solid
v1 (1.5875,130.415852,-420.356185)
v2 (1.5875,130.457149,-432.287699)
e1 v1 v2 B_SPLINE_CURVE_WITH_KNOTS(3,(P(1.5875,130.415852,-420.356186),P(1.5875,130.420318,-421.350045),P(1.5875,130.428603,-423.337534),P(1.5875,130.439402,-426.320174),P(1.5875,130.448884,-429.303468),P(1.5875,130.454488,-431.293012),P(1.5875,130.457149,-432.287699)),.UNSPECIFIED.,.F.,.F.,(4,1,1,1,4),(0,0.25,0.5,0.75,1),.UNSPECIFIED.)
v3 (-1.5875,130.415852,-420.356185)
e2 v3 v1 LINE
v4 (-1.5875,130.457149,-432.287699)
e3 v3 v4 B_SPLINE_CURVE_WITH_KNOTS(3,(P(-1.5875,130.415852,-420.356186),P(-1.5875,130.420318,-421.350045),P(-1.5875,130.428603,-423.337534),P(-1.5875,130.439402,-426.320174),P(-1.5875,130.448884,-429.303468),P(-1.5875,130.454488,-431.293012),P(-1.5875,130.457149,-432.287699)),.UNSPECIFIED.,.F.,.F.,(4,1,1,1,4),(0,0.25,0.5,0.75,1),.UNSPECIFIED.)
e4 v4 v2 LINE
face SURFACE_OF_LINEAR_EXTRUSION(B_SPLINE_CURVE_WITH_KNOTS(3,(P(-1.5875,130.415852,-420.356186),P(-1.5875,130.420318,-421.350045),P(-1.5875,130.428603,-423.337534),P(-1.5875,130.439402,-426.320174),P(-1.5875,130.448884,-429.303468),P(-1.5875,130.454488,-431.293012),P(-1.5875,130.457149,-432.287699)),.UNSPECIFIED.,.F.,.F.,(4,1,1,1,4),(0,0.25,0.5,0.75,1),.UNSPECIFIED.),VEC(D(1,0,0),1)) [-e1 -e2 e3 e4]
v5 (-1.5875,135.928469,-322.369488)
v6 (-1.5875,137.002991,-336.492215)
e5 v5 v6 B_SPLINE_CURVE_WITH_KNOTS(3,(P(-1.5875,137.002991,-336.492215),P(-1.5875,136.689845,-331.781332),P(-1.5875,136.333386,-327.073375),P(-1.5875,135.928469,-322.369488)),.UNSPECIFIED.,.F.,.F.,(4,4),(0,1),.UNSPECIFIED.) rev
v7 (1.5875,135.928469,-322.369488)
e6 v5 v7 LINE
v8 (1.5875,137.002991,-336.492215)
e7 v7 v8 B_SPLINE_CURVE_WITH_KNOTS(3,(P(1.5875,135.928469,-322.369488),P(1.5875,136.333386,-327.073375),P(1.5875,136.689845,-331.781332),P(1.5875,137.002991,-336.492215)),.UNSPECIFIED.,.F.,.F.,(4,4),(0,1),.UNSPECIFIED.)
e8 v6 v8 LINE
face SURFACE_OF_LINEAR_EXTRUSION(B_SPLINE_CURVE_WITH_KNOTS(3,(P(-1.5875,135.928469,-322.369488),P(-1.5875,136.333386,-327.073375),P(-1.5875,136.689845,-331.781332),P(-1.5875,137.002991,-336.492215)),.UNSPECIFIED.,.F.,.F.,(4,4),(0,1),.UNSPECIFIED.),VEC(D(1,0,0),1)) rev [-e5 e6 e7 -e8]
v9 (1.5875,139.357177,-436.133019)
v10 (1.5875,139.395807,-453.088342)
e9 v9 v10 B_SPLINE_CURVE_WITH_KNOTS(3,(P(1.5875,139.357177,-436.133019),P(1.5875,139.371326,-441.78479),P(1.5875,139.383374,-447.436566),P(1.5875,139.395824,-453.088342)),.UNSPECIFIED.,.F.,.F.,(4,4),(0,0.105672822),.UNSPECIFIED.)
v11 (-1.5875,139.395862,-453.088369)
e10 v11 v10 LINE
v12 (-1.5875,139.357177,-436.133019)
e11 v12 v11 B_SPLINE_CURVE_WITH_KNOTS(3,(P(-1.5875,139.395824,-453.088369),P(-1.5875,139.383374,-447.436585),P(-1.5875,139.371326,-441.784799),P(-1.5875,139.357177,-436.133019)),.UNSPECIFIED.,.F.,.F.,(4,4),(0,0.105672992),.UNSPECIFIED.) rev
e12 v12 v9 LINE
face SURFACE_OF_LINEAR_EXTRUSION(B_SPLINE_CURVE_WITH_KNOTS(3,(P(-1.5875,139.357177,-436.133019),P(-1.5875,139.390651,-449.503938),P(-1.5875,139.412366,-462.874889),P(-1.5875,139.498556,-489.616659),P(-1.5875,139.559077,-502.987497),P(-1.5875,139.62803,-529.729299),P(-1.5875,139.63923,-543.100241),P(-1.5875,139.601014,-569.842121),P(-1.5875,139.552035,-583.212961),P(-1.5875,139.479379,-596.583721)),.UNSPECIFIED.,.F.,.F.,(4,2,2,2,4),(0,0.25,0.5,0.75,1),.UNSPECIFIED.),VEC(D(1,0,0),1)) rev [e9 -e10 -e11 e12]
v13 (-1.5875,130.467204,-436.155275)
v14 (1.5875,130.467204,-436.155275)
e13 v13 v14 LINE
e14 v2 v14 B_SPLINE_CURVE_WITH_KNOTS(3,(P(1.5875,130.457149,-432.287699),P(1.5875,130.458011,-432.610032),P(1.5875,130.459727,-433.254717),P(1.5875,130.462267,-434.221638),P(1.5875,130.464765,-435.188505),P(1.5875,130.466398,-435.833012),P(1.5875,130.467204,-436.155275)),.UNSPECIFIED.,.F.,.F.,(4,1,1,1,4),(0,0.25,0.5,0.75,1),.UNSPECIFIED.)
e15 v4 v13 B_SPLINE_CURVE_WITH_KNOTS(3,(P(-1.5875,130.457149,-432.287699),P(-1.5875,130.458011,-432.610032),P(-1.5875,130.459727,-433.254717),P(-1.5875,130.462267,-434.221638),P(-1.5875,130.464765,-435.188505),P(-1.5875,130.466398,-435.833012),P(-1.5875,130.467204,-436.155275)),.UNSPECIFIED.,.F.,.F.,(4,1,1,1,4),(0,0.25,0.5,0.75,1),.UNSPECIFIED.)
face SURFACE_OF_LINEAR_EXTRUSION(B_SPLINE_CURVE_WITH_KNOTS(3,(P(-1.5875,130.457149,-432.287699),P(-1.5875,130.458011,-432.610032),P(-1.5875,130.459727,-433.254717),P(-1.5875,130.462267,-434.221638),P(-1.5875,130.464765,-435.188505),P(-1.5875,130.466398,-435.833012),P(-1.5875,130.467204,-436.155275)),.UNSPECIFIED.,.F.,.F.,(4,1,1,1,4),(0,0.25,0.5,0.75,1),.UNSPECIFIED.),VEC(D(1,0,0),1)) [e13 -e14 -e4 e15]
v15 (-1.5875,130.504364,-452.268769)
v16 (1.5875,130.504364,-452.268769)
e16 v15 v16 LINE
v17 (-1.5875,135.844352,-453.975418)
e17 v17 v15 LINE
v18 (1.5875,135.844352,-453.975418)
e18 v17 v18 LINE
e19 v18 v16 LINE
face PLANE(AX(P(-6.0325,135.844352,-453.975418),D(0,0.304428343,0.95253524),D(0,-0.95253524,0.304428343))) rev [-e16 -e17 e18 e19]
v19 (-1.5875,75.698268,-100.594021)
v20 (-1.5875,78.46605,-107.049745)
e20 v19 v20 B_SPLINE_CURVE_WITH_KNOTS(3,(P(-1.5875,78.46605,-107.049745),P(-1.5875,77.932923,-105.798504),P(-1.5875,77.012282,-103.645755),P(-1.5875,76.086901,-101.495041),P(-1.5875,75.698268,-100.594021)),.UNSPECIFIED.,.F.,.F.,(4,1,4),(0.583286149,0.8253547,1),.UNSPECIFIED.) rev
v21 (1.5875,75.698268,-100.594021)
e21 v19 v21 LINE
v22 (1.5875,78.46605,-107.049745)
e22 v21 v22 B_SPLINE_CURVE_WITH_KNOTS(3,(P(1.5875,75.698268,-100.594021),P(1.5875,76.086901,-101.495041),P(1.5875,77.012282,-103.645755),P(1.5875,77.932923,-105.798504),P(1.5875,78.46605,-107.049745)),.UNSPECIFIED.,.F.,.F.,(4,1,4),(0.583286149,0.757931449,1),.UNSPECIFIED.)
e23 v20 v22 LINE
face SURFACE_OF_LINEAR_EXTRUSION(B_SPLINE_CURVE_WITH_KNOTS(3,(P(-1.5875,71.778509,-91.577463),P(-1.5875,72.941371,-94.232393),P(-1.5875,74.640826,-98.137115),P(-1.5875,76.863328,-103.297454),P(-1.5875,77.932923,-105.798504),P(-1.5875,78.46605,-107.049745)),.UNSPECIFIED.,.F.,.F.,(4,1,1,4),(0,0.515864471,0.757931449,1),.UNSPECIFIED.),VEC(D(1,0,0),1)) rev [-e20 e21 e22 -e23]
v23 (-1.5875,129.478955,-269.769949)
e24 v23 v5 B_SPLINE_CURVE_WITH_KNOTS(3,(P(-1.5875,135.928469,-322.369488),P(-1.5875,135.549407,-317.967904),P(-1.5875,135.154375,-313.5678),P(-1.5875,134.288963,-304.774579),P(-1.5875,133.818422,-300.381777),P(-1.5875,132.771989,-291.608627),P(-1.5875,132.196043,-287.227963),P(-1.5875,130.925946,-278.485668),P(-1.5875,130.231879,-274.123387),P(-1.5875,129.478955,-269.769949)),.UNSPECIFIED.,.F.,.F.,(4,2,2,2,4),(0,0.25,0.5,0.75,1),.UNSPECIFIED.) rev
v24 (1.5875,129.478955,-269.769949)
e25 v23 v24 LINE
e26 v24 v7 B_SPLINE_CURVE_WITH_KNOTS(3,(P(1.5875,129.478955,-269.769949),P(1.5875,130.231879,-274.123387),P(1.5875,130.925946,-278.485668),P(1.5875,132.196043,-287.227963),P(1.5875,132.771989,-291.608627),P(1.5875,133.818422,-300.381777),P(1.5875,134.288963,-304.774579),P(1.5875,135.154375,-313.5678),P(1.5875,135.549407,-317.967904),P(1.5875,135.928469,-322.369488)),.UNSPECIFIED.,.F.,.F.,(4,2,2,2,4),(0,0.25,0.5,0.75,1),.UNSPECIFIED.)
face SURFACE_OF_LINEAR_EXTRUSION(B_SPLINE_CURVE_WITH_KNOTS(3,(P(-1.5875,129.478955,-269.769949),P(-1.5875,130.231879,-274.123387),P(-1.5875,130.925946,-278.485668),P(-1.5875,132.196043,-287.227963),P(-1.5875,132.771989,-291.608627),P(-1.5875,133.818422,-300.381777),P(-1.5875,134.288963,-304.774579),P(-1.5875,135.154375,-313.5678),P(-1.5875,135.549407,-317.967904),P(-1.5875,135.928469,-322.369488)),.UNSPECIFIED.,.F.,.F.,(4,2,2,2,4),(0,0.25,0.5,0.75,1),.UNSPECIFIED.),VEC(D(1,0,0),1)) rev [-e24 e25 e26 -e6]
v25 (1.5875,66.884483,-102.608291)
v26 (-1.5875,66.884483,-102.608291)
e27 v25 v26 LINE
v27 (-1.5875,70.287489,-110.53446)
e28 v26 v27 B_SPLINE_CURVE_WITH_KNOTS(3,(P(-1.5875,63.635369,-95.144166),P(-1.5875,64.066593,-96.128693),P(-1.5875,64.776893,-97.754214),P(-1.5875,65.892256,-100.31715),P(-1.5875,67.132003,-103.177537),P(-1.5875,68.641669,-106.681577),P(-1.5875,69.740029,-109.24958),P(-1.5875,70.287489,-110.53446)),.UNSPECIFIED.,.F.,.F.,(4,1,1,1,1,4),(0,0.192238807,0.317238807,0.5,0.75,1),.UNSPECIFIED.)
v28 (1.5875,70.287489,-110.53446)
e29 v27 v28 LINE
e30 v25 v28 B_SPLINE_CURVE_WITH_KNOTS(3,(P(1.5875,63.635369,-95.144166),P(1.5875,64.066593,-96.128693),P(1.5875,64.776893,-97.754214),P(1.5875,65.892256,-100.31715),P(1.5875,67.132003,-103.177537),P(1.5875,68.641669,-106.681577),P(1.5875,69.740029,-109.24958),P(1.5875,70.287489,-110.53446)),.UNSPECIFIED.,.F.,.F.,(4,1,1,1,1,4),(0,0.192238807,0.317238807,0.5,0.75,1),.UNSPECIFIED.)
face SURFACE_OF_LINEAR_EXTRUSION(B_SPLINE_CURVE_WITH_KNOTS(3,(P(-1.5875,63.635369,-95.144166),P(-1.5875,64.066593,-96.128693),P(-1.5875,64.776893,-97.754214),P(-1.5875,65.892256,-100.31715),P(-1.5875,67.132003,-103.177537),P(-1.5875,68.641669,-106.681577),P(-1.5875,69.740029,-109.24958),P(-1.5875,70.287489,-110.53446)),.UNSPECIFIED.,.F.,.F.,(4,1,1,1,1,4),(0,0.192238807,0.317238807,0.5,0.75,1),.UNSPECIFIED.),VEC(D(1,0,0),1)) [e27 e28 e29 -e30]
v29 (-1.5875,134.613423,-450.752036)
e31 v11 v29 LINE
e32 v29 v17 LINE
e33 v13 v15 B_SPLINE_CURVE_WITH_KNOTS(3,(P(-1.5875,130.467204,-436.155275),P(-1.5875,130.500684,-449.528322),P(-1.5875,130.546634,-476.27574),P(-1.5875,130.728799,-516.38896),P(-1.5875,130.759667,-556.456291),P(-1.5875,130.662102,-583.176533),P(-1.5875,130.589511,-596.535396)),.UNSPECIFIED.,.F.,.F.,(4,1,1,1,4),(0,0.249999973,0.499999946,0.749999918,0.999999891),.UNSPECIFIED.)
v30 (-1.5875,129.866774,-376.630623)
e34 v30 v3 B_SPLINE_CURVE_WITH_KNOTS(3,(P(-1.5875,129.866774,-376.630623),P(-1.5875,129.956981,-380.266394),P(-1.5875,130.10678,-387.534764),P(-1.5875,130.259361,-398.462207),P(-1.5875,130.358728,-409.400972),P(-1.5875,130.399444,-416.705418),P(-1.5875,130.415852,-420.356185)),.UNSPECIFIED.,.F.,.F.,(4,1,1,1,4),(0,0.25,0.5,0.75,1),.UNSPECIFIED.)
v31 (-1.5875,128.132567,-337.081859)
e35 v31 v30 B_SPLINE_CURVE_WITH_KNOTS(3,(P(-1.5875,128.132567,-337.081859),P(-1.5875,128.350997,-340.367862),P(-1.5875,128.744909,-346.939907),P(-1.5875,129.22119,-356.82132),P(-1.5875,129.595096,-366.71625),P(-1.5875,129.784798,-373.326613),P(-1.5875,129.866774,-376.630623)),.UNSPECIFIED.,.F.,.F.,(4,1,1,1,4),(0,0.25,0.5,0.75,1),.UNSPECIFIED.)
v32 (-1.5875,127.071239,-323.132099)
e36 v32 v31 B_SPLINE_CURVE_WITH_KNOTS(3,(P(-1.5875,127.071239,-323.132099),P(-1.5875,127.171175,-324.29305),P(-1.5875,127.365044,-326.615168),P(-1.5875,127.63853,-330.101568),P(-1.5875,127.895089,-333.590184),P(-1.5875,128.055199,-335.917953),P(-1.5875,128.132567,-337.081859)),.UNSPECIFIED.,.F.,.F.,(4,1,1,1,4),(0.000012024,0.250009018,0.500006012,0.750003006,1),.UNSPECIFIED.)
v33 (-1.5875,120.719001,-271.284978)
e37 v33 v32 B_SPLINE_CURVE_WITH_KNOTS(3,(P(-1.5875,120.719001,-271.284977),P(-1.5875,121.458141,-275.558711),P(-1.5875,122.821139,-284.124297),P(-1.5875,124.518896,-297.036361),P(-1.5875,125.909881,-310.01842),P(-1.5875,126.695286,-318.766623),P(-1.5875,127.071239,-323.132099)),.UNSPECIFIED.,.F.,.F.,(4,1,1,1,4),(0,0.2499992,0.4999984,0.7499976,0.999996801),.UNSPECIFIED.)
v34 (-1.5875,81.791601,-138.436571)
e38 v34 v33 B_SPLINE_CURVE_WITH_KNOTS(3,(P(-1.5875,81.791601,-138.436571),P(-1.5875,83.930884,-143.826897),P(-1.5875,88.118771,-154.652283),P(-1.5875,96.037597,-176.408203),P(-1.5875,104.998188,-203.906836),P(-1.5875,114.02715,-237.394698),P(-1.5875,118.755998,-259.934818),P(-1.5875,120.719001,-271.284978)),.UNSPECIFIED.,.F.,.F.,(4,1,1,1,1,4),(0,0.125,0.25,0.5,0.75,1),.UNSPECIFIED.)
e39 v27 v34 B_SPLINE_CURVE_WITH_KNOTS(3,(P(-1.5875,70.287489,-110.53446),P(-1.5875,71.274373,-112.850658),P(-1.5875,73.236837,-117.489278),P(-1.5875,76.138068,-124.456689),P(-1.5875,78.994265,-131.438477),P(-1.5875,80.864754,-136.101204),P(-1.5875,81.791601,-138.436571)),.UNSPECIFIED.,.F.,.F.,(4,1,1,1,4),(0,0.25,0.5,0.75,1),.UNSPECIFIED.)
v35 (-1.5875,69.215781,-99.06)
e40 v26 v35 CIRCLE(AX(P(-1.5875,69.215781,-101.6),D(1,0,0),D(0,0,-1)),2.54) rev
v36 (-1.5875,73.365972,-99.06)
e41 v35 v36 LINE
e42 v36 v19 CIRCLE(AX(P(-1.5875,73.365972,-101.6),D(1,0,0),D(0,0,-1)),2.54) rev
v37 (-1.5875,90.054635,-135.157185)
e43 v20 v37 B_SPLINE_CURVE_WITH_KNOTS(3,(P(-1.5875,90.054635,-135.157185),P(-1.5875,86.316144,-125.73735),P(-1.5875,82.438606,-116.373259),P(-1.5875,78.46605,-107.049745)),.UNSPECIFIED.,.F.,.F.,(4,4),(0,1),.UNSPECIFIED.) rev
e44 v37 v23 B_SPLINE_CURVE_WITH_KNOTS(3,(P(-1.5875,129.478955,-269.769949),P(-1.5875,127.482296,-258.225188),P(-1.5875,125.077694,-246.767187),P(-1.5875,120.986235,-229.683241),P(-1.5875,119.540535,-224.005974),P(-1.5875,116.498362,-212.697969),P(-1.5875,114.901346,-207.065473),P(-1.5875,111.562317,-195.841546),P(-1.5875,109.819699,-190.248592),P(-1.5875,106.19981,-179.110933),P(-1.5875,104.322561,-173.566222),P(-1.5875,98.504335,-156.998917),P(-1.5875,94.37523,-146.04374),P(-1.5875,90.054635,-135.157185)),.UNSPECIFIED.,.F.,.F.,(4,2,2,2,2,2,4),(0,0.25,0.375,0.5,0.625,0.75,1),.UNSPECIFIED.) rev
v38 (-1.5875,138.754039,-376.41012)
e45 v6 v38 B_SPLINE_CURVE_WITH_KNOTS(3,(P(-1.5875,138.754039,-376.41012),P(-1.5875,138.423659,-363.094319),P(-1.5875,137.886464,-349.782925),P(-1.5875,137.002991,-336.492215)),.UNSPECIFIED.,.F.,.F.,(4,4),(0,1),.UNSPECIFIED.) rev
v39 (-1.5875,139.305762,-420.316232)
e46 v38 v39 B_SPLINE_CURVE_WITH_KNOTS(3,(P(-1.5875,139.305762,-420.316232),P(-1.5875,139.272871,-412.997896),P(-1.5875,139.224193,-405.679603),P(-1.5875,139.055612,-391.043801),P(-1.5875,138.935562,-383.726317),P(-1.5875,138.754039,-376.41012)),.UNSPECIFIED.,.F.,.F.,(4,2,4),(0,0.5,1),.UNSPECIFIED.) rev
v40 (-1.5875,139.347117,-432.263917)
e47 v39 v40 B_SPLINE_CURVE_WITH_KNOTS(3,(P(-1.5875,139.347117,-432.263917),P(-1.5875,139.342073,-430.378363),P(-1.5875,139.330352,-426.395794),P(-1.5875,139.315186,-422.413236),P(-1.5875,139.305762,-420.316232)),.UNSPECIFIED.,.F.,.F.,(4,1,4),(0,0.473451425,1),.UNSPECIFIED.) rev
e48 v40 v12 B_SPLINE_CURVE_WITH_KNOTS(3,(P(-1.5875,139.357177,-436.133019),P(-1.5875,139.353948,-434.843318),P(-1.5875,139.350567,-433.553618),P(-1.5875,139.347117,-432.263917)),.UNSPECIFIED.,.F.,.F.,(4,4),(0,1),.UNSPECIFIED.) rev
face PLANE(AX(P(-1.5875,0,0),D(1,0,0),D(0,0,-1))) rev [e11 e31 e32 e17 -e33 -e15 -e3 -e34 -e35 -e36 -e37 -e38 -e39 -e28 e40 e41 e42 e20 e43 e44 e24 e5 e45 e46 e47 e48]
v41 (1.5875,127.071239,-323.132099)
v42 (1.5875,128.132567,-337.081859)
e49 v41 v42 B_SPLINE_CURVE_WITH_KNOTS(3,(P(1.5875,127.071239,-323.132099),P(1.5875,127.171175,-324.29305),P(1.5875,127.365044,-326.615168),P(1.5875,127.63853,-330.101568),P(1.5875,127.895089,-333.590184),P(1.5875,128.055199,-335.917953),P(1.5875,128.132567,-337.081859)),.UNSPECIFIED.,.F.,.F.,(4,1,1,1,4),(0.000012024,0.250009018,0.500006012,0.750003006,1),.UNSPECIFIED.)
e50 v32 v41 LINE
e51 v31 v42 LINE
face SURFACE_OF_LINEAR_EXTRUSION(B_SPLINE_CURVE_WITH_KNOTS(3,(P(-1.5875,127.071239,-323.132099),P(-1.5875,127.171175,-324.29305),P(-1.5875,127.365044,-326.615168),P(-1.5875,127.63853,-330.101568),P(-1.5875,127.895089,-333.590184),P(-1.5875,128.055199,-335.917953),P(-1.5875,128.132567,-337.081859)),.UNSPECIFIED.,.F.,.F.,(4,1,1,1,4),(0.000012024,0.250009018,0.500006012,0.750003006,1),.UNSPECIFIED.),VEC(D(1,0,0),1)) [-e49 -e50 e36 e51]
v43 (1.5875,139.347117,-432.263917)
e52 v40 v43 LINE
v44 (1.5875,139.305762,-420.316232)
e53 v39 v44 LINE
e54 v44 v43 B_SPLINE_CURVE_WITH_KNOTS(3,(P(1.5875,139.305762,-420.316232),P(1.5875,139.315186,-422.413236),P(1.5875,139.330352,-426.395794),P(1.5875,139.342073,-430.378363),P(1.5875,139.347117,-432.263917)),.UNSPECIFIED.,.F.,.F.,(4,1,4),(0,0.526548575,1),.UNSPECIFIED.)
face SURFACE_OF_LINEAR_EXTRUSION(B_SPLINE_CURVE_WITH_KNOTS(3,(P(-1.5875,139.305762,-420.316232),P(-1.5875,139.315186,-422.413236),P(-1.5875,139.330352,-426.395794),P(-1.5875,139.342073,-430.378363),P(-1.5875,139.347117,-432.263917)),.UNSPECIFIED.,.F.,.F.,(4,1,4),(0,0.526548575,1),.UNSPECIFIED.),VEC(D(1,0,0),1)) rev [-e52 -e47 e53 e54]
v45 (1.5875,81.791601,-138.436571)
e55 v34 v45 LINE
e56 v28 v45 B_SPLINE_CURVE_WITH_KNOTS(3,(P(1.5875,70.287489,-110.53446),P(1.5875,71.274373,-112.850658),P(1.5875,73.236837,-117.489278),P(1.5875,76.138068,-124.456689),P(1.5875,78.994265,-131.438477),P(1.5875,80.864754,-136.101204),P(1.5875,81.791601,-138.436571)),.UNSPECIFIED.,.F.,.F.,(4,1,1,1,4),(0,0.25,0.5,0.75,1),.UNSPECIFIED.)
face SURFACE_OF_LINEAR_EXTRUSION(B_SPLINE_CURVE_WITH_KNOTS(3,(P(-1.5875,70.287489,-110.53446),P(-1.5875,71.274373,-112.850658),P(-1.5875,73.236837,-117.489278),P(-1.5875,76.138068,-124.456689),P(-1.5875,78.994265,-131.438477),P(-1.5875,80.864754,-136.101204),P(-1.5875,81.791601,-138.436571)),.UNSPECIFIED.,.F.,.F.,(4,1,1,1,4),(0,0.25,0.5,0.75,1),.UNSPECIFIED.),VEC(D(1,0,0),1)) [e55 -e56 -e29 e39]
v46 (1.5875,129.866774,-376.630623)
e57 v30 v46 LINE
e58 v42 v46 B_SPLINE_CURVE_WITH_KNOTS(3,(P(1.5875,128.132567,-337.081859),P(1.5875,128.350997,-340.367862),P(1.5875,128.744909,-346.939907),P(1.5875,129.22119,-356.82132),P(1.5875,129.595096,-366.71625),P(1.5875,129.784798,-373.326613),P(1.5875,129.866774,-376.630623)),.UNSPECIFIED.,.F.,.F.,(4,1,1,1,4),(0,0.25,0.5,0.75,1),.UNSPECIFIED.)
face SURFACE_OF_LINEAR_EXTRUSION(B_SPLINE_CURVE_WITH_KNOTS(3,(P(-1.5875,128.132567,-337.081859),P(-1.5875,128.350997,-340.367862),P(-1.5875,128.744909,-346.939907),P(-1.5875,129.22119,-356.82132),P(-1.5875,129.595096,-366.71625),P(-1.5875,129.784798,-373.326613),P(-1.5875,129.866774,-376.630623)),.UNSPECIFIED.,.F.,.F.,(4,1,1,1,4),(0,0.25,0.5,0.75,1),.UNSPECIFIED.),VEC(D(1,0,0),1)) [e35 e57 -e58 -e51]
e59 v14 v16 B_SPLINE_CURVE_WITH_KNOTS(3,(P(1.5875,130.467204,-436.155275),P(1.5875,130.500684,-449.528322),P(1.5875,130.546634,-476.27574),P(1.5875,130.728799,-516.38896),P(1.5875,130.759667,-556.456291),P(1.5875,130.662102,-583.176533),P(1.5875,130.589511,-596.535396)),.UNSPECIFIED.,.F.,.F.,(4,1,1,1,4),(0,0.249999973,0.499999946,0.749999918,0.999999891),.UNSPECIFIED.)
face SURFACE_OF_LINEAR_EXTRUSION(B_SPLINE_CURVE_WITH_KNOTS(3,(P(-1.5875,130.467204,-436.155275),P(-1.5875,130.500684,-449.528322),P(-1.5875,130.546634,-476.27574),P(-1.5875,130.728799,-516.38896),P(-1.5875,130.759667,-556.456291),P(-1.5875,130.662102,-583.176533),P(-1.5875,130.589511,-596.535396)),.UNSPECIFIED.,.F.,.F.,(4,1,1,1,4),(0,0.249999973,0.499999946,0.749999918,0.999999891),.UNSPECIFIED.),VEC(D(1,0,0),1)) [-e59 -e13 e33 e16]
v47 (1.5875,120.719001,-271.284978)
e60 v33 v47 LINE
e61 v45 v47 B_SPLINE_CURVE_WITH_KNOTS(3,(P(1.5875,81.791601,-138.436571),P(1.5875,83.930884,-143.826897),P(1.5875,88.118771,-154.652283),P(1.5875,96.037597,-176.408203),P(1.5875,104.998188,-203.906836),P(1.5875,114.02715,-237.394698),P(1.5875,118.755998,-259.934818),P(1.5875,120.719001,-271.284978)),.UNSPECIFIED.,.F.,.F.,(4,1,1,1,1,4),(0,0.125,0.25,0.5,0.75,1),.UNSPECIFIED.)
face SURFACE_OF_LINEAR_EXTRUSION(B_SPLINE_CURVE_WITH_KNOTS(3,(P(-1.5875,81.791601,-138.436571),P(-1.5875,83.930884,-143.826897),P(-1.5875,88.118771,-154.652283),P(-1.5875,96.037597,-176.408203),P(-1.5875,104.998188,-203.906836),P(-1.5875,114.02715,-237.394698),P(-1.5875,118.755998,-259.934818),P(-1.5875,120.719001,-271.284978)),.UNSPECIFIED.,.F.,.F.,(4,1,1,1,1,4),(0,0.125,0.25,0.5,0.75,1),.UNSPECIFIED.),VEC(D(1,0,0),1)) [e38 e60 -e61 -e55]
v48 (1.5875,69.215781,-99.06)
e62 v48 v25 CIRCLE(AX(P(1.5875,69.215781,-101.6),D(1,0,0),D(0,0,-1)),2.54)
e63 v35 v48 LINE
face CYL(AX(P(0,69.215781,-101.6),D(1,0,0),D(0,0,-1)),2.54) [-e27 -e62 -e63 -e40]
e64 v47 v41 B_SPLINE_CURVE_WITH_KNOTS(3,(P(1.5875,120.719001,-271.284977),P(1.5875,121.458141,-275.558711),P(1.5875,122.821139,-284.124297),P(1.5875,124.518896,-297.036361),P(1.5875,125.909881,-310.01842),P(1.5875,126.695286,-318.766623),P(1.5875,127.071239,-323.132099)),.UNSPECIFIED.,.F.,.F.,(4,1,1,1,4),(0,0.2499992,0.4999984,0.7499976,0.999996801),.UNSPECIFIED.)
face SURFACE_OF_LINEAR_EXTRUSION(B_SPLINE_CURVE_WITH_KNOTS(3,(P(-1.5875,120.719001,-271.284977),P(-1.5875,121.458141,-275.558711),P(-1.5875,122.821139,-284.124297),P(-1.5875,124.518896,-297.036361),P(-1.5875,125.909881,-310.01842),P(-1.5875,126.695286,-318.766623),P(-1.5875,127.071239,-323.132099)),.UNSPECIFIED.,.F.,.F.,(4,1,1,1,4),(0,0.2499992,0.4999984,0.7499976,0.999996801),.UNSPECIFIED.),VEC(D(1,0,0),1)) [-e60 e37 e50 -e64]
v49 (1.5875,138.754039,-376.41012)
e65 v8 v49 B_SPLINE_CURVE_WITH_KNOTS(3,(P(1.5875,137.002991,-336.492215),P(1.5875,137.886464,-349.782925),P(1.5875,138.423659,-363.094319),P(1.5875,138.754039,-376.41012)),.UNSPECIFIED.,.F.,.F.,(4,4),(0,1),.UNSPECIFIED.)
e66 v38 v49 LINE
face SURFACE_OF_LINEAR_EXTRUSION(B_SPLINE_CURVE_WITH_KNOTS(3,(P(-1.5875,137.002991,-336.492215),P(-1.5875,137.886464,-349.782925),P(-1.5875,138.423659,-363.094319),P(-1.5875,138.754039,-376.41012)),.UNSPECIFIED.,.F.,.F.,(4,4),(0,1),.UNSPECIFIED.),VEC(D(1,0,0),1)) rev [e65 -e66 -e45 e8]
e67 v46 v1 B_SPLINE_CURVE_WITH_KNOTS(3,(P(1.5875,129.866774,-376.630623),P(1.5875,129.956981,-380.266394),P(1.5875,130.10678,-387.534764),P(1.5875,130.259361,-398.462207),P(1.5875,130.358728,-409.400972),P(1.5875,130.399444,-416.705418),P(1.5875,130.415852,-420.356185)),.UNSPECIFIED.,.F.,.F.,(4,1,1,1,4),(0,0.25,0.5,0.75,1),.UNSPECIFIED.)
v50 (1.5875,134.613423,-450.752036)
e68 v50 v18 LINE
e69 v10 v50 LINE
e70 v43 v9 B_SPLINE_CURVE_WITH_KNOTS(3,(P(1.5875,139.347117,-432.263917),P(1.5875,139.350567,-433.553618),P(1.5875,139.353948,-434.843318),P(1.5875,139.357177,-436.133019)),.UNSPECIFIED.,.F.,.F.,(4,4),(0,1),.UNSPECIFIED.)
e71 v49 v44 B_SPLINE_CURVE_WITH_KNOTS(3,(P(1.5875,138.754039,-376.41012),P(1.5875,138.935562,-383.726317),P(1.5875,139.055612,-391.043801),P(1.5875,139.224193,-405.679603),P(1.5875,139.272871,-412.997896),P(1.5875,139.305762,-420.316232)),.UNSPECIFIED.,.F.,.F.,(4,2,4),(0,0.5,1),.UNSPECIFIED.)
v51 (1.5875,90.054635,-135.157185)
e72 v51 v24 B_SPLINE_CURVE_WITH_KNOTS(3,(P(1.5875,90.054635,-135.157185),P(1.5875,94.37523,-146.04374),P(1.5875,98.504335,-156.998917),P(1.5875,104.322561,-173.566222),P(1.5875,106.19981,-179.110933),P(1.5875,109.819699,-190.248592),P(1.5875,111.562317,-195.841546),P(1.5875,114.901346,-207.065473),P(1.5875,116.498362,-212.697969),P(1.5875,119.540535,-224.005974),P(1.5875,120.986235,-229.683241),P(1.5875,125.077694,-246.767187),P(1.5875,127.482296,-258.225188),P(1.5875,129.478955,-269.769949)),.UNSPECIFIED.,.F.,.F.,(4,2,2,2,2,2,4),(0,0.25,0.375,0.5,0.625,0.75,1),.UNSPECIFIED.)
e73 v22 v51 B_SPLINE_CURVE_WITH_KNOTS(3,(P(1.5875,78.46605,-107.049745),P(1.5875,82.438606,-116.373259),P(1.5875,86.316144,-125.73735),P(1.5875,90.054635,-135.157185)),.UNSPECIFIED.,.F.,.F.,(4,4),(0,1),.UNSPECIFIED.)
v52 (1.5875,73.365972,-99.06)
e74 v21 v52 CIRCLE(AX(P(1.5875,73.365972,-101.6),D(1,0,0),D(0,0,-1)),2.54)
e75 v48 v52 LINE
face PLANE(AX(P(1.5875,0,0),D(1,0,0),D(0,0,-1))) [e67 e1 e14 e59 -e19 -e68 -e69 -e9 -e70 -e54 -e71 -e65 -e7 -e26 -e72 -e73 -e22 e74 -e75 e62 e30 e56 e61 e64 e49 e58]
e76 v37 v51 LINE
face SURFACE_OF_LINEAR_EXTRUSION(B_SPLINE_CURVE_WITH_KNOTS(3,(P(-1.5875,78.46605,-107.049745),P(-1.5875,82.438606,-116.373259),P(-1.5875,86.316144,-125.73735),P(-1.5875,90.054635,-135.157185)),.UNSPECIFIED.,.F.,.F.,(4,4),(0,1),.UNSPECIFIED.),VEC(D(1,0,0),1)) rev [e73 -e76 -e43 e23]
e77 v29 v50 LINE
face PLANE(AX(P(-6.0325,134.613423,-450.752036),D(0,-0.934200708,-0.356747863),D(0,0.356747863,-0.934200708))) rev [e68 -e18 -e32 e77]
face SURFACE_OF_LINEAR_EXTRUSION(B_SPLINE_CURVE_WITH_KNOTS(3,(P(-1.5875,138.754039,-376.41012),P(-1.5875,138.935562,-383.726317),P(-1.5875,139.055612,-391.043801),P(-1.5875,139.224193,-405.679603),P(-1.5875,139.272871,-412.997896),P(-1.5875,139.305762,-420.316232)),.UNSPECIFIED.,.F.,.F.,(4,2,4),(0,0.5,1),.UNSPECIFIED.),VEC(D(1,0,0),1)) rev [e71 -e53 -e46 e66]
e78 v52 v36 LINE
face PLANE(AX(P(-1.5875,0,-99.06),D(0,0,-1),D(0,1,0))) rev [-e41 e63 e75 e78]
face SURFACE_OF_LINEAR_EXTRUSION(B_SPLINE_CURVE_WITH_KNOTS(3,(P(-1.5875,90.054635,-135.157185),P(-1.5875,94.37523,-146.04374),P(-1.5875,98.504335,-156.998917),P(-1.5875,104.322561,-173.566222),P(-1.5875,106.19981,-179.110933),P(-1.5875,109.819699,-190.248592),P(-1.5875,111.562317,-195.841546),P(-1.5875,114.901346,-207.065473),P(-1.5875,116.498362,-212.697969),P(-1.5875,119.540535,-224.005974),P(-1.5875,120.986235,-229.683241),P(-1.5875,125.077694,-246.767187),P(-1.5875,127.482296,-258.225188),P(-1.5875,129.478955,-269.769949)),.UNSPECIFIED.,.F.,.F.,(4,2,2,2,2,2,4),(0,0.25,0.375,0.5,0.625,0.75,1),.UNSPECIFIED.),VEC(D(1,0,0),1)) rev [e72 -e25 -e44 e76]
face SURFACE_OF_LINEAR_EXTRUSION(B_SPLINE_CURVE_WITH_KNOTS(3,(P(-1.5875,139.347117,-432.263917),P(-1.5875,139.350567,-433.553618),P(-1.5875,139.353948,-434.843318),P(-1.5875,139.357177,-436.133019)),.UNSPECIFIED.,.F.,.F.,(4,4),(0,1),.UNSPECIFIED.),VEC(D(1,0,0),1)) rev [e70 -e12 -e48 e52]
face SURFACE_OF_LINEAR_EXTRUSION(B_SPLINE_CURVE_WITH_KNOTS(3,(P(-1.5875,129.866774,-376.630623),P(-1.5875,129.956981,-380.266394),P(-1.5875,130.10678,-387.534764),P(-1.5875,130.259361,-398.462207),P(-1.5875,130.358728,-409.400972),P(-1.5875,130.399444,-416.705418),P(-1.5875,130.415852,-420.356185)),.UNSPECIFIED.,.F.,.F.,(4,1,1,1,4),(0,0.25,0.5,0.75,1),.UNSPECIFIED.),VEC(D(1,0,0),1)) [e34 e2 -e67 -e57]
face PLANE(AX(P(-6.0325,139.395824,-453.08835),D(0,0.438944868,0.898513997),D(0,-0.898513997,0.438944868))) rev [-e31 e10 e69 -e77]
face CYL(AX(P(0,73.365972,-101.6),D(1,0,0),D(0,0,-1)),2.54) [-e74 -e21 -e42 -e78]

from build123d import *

# Parameters (mm, degrees)
BOSS_EXTRUDE1_START = -1.5875
BOSS_EXTRUDE1_DEPTH = 3.175
FILLET1_R           = 2.54
CUT_EXTRUDE1_DEPTH  = 2674.191025632
FILLET2_R           = 0.762
FILLET3_R           = 0.762
CUT_EXTRUDE2_DEPTH  = 7.62


with BuildPart() as part:
    # Boss-Extrude1: read off the stored shape, not the designer's step
    # Boss-Extrude1 outline → Boss-Extrude1 (new body)
    with BuildSketch(Plane(origin=(0, 0, 0), x_dir=(0, 0, -1), z_dir=(1, 0, 0)).offset(BOSS_EXTRUDE1_START)):
        with BuildLine():
            add(Edge.make_bspline(
                [(1110.404970926, 130.384545774), (1120.170834465, 130.370061323), (1139.703057908, 130.338772026), (1168.998370974, 130.277673039), (1198.290610395, 130.194386876), (1217.81419633, 130.113940836), (1227.576506903, 130.06508052)],
                knots=[0, 0, 0, 0, 0.25, 0.5, 0.75, 1, 1, 1, 1], degree=3))
            add(Edge.make_bspline(
                [(1227.576506903, 130.06508052), (1269.911205773, 129.853195249), (1333.427746701, 129.273373321), (1418.042208161, 127.449050563), (1502.665994832, 124.913583682), (1608.454176987, 120.803299479), (1693.070073331, 116.848243245), (1735.369787733, 114.744712179)],
                knots=[0, 0, 0, 0, 0.25, 0.375, 0.5, 0.75, 1, 1, 1, 1], degree=3))
            add(Edge.make_bspline(
                [(1735.369787733, 114.744712179), (1815.995940723, 110.735232018), (1936.906650462, 104.096364548), (2098.049485168, 94.18797875), (2198.694736725, 87.314638509), (2279.130413747, 81.114418931), (2339.412950304, 76.034076608), (2399.564054334, 70.28270545), (2479.570468264, 61.127378254), (2559.292087872, 49.650907614), (2626.797554585, 38.235484735), (2656.889518578, 32.788503969), (2667.159793662, 30.877771266), (2669.54, 30.432069924)],
                knots=[0, 0, 0, 0, 0.25, 0.375, 0.5, 0.5625, 0.625, 0.6875, 0.75, 0.875, 0.9375, 0.96241067, 0.969928536, 0.969928536, 0.969928536, 0.969928536], degree=3))
            Line((2669.54, 30.432069924), (2669.54, 39.476142465))
            add(Edge.make_bspline(
                [(1735.811334709, 123.623740069), (1776.138635499, 121.618292624), (1816.460281579, 119.500621806), (1897.093668675, 115.087561885), (1937.405638896, 112.792971084), (2018.018419045, 108.018366523), (2058.319512223, 105.539122976), (2138.903780144, 100.307240032), (2179.18739793, 97.555127955), (2239.586998714, 93.080168687), (2259.716280977, 91.529837622), (2289.900442602, 89.09084343), (2299.960179135, 88.258845039), (2320.076004566, 86.552861654), (2330.132100898, 85.678962223), (2350.239356518, 83.874334847), (2360.290489794, 82.943307484), (2380.385973971, 81.003183297), (2390.430065378, 79.993418555), (2420.547026195, 76.827577532), (2440.60648589, 74.533672955), (2480.675569568, 69.556278523), (2500.68715183, 66.874150811), (2540.654290207, 61.150246295), (2560.611026428, 58.109755646), (2600.475457131, 51.702465574), (2620.382967089, 48.337538888), (2650.028116889, 43.072156367), (2659.78844051, 41.29687683), (2669.54, 39.476142465)],
                knots=[0, 0, 0, 0, 0.125, 0.125, 0.25, 0.25, 0.375, 0.375, 0.5, 0.5, 0.5625, 0.5625, 0.59375, 0.59375, 0.625, 0.625, 0.65625, 0.65625, 0.6875, 0.6875, 0.75, 0.75, 0.8125, 0.8125, 0.875, 0.875, 0.9375, 0.9375, 0.968210768, 0.968210768, 0.968210768, 0.968210768], degree=3))
            add(Edge.make_bspline(
                [(1227.621000751, 138.954969175), (1248.807303679, 138.848931677), (1269.993583155, 138.701170252), (1312.363832348, 138.270664618), (1333.547719008, 137.987407832), (1375.912368189, 137.249274813), (1397.09309738, 136.7925677), (1439.451328259, 135.701855835), (1460.629010312, 135.069210584), (1502.979101161, 133.670541385), (1524.152152736, 132.907434339), (1566.494303759, 131.284732459), (1587.663166024, 130.423163385), (1651.164052809, 127.709123983), (1693.490421561, 125.728325331), (1735.811334709, 123.623740069)],
                knots=[0, 0, 0, 0, 0.125, 0.125, 0.25, 0.25, 0.375, 0.375, 0.5, 0.5, 0.625, 0.625, 0.75, 0.75, 1, 1, 1, 1], degree=3))
            add(Edge.make_bspline(
                [(1110.418156307, 139.274535996), (1129.952027249, 139.245563914), (1149.485893504, 139.211997476), (1188.553558893, 139.115899087), (1208.087346834, 139.052735015), (1227.621000751, 138.954969175)],
                knots=[0, 0, 0, 0, 0.5, 0.5, 1, 1, 1, 1], degree=3))
            add(Edge.make_bspline(
                [(768.740124165, 138.468408213), (782.976796045, 138.460280143), (797.213453801, 138.479500079), (825.686695051, 138.549690296), (839.923258916, 138.600062665), (868.396318956, 138.719026333), (882.632808962, 138.789607972), (911.105746117, 138.939594729), (925.342197007, 139.018479563), (953.81517223, 139.160090703), (968.051699178, 139.222241505), (996.524919377, 139.30995407), (1010.761605517, 139.335014039), (1039.234912871, 139.349647552), (1053.471562869, 139.340493535), (1081.944860968, 139.313691902), (1096.181508981, 139.29565137), (1110.418156307, 139.274535996)],
                knots=[0, 0, 0, 0, 0.125, 0.125, 0.25, 0.25, 0.375, 0.375, 0.5, 0.5, 0.625, 0.625, 0.75, 0.75, 0.875, 0.875, 1, 1, 1, 1], degree=3))
            add(Edge.make_bspline(
                [(630.778432202, 139.251437536), (653.771819614, 139.075315664), (676.765000849, 138.871740519), (711.255349111, 138.647690701), (722.752238945, 138.586174182), (745.746099074, 138.499784896), (757.243084259, 138.474972158), (768.740124165, 138.468408213)],
                knots=[0, 0, 0, 0, 0.5, 0.5, 0.75, 0.75, 1, 1, 1, 1], degree=3))
            add(Edge.make_bspline(
                [(604.514984259, 139.433685568), (609.940743136, 139.400696354), (618.695242427, 139.342071397), (627.449694696, 139.276935028), (630.778432202, 139.251437536)],
                knots=[0, 0, 0, 0, 0.619765686, 1, 1, 1, 1], degree=3))
            ThreePointArc((604.514984259, 139.433685568), (600.549356142, 139.457173081), (596.583720644, 139.479379304))
            add(Edge.make_bspline(
                [(436.133018826, 139.357176562), (449.50393779, 139.390650739), (462.874888934, 139.412366015), (489.61665939, 139.498555977), (502.987497127, 139.559076553), (529.729299233, 139.628029754), (543.100240501, 139.639230481), (569.84212102, 139.601013959), (583.212960696, 139.552035302), (596.583720644, 139.479379304)],
                knots=[0, 0, 0, 0, 0.25, 0.25, 0.5, 0.5, 0.75, 0.75, 1, 1, 1, 1], degree=3))
            add(Edge.make_bspline(
                [(432.263917423, 139.347117104), (433.553617637, 139.350567112), (434.843318039, 139.353947814), (436.133018826, 139.357176562)],
                knots=[0, 0, 0, 0, 1, 1, 1, 1], degree=3))
            add(Edge.make_bspline(
                [(420.316232014, 139.305761868), (422.413235913, 139.315186344), (426.395793967, 139.330351666), (430.378363115, 139.342073082), (432.263917423, 139.347117104)],
                knots=[0, 0, 0, 0, 0.526548575, 1, 1, 1, 1], degree=3))
            add(Edge.make_bspline(
                [(376.410119779, 138.75403864), (383.726317086, 138.935561778), (391.043801196, 139.055611797), (405.679602634, 139.224192856), (412.997895507, 139.272871444), (420.316232014, 139.305761868)],
                knots=[0, 0, 0, 0, 0.5, 0.5, 1, 1, 1, 1], degree=3))
            add(Edge.make_bspline(
                [(336.49221538, 137.002990798), (349.782924989, 137.88646357), (363.094318653, 138.423658969), (376.410119779, 138.75403864)],
                knots=[0, 0, 0, 0, 1, 1, 1, 1], degree=3))
            add(Edge.make_bspline(
                [(322.369488076, 135.928469458), (327.073374868, 136.333386449), (331.781331813, 136.689844531), (336.49221538, 137.002990798)],
                knots=[0, 0, 0, 0, 1, 1, 1, 1], degree=3))
            add(Edge.make_bspline(
                [(269.769949315, 129.47895505), (274.123387467, 130.231879276), (278.485668028, 130.925946417), (287.22796256, 132.196043087), (291.608626646, 132.771988738), (300.381777496, 133.818422146), (304.774579419, 134.288963443), (313.567800313, 135.154375086), (317.967903853, 135.549407043), (322.369488076, 135.928469458)],
                knots=[0, 0, 0, 0, 0.25, 0.25, 0.5, 0.5, 0.75, 0.75, 1, 1, 1, 1], degree=3))
            add(Edge.make_bspline(
                [(135.15718457, 90.054634926), (146.043739673, 94.375230064), (156.99891695, 98.504335222), (173.56622243, 104.322560697), (179.110932848, 106.199810145), (190.24859245, 109.819698901), (195.841545849, 111.562316625), (207.065472514, 114.901345648), (212.697969124, 116.49836249), (224.005973618, 119.540534541), (229.683240596, 120.9862349), (246.767187276, 125.077694043), (258.225188059, 127.482295924), (269.769949315, 129.47895505)],
                knots=[0, 0, 0, 0, 0.25, 0.25, 0.375, 0.375, 0.5, 0.5, 0.625, 0.625, 0.75, 0.75, 1, 1, 1, 1], degree=3))
            add(Edge.make_bspline(
                [(107.049744533, 78.466050261), (116.373258882, 82.438606419), (125.737350123, 86.316143859), (135.15718457, 90.054634926)],
                knots=[0, 0, 0, 0, 1, 1, 1, 1], degree=3))
            add(Edge.make_bspline(
                [(99.06, 75.03568963), (99.223542669, 75.106424562), (100.635498802, 75.716852689), (103.297453866, 76.863328103), (105.798503999, 77.932922637), (107.049744533, 78.466050261)],
                knots=[0.484151133, 0.484151133, 0.484151133, 0.484151133, 0.515864471, 0.757931449, 1, 1, 1, 1], degree=3))
            Line((99.06, 75.03568963), (99.06, 65.345043949))
            add(Edge.make_bspline(
                [(99.06, 65.345043949), (99.380370965, 65.484464523), (100.637671455, 66.031176319), (103.17753745, 67.132002814), (106.681577323, 68.64166857), (109.249580285, 69.740028797), (110.534459652, 70.287489229)],
                knots=[0.254738807, 0.254738807, 0.254738807, 0.254738807, 0.317238807, 0.5, 0.75, 1, 1, 1, 1], degree=3))
            add(Edge.make_bspline(
                [(110.534459652, 70.287489229), (112.850658013, 71.274373329), (117.489277519, 73.236837099), (124.456688526, 76.138068453), (131.438476528, 78.994265342), (136.101204469, 80.864754132), (138.436571012, 81.791601309)],
                knots=[0, 0, 0, 0, 0.25, 0.5, 0.75, 1, 1, 1, 1], degree=3))
            add(Edge.make_bspline(
                [(138.436571012, 81.791601309), (143.826897197, 83.930883835), (154.6522834, 88.11877139), (176.408203186, 96.037596764), (203.906835742, 104.998187521), (237.39469787, 114.027149543), (259.934818065, 118.755998441), (271.284977744, 120.719001348)],
                knots=[0, 0, 0, 0, 0.125, 0.25, 0.5, 0.75, 1, 1, 1, 1], degree=3))
            add(Edge.make_bspline(
                [(271.284977744, 120.719001348), (275.558711595, 121.458140765), (284.124297478, 122.821139095), (297.036360548, 124.518896272), (310.018420247, 125.909880891), (318.766623126, 126.695286194), (323.13209925, 127.071239405)],
                knots=[5e-09, 5e-09, 5e-09, 5e-09, 0.2499992, 0.4999984, 0.7499976, 0.999996801, 0.999996801, 0.999996801, 0.999996801], degree=3))
            add(Edge.make_bspline(
                [(323.13209925, 127.071239405), (324.293050056, 127.171175344), (326.615168427, 127.365043892), (330.101568176, 127.638529754), (333.590184216, 127.895089457), (335.917953069, 128.055198639), (337.081858513, 128.132566852)],
                knots=[1.2024e-05, 1.2024e-05, 1.2024e-05, 1.2024e-05, 0.250009018, 0.500006012, 0.750003006, 1, 1, 1, 1], degree=3))
            add(Edge.make_bspline(
                [(337.081858513, 128.132566852), (340.367862287, 128.350997241), (346.939906877, 128.744909116), (356.821319657, 129.221190111), (366.716250393, 129.595096292), (373.326613137, 129.784797569), (376.630622597, 129.866773678)],
                knots=[0, 0, 0, 0, 0.25, 0.5, 0.75, 1, 1, 1, 1], degree=3))
            add(Edge.make_bspline(
                [(376.630622597, 129.866773678), (380.266394474, 129.956981294), (387.534764147, 130.106779908), (398.462206547, 130.259361028), (409.400972015, 130.358727994), (416.705417778, 130.39944419), (420.356185481, 130.415851648)],
                knots=[0, 0, 0, 0, 0.25, 0.5, 0.75, 1, 1, 1, 1], degree=3))
            add(Edge.make_bspline(
                [(420.356185481, 130.415851648), (421.350045129, 130.420318309), (423.337533562, 130.428603137), (426.320174328, 130.439402209), (429.303468332, 130.448883952), (431.293011648, 130.454488038), (432.287698861, 130.457148912)],
                knots=[0, 0, 0, 0, 0.25, 0.5, 0.75, 1, 1, 1, 1], degree=3))
            add(Edge.make_bspline(
                [(432.287698861, 130.457148912), (432.610032304, 130.45801117), (433.254717136, 130.45972707), (434.221637716, 130.462266911), (435.188505114, 130.464765142), (435.833012253, 130.466397641), (436.155274747, 130.46720442)],
                knots=[9.2e-08, 9.2e-08, 9.2e-08, 9.2e-08, 0.25, 0.5, 0.75, 1, 1, 1, 1], degree=3))
            add(Edge.make_bspline(
                [(436.155274747, 130.46720442), (449.528322363, 130.500683927), (476.275740382, 130.546633815), (516.38896029, 130.728798697), (556.456290895, 130.759667498), (583.176533448, 130.662101975), (596.535396133, 130.589510646)],
                knots=[0, 0, 0, 0, 0.249999973, 0.499999946, 0.749999918, 0.999999891, 0.999999891, 0.999999891, 0.999999891], degree=3))
            ThreePointArc((596.535396133, 130.589510646), (600.498158983, 130.567320504), (604.460914457, 130.543849998))
            add(Edge.make_bspline(
                [(604.460914457, 130.543849998), (606.648150431, 130.530551362), (611.022503017, 130.502867011), (617.584689429, 130.458405465), (624.147187284, 130.411339888), (628.522663802, 130.378455494), (630.7103385, 130.361698324)],
                knots=[-7.09e-07, -7.09e-07, -7.09e-07, -7.09e-07, 0.249999468, 0.499999646, 0.749999823, 1, 1, 1, 1], degree=3))
            add(Edge.make_bspline(
                [(630.7103385, 130.361698324), (642.206126489, 130.273644326), (665.193556095, 130.083785311), (699.699077953, 129.819212193), (734.21504011, 129.634735151), (757.228597075, 129.58497898), (768.735048644, 129.578409662)],
                knots=[0, 0, 0, 0, 0.25, 0.5, 0.75, 1, 1, 1, 1], degree=3))
            add(Edge.make_bspline(
                [(768.735048644, 129.578409662), (797.222409768, 129.56214552), (854.203652026, 129.725124503), (939.635195481, 130.236578518), (1024.992958464, 130.524931921), (1081.937612336, 130.426767717), (1110.404970926, 130.384545774)],
                knots=[0, 0, 0, 0, 0.25, 0.5, 0.75, 1, 1, 1, 1], degree=3))
        make_face()
    extrude(amount=BOSS_EXTRUDE1_DEPTH)

    # Fillet1
    fillet1_edges = [part.edges().sort_by_distance(p)[0] for p in [
        (0, 39.476142465, -2669.54),
        (0, 30.432069924, -2669.54),
        (0, 65.345043949, -99.06),
        (0, 75.03568963, -99.06),
    ]]
    fillet(fillet1_edges, radius=FILLET1_R)

    # Sketch4 → Cut-Extrude1 (cut, through all)
    with BuildSketch(Plane(origin=(1.5875, 0, 0), x_dir=(0, 0, -1), z_dir=(1, 0, 0))):
        Polygon((1827.2125, 118.895836595), (1827.2125, 110.000384115), (1827.2125, 78.791710134), (2135.1875, 78.791710134), (2135.1875, 91.599357392), (2135.1875, 100.508307819), (2135.1875, 129.353842083), (1827.2125, 129.353842083), align=None)
    extrude(amount=-CUT_EXTRUDE1_DEPTH, mode=Mode.SUBTRACT)


with BuildPart() as cut_extrude1_piece_1:
    # of the separate pieces the step leaves, piece 1, a body of its own (cut_extrude1_pieces)
    add(part.part.solids().sort_by_distance((-1.5875, 114.744712179, -1735.369787733))[0])

    # Fillet2
    fillet2_edges = [cut_extrude1_piece_1.edges().sort_by_distance(p)[0] for p in [
        (0, 118.895836595, -1827.2125),
        (0, 110.000384116, -1827.2125),
    ]]
    fillet(fillet2_edges, radius=FILLET2_R)


with BuildPart() as cut_extrude1_piece_2:
    # of the separate pieces the step leaves, piece 2, a body of its own (cut_extrude1_pieces)
    add(part.part.solids().sort_by_distance((-1.5875, 91.599357392, -2135.1875))[0])

    # Fillet3
    fillet3_edges = [cut_extrude1_piece_2.edges().sort_by_distance(p)[0] for p in [
        (0, 100.508307819, -2135.1875),
        (0, 91.599357392, -2135.1875),
    ]]
    fillet(fillet3_edges, radius=FILLET3_R)


with BuildPart() as cut_extrude2_tool:
    # Sketch5 → Cut-Extrude2 (new body)
    with BuildSketch(Plane(origin=(1.5875, 0, 0), x_dir=(0, 0, -1), z_dir=(1, 0, 0))):
        Polygon((453.088349995, 139.395824167), (450.752036301, 134.613422753), (453.975418286, 135.844351639), (452.268768997, 130.504363999), (452.268768997, 120.265529488), (2798.774335261, -181.4514548), (2948.646980362, 339.158786075), (453.088349995, 144.042560639), align=None)
    extrude(amount=-CUT_EXTRUDE2_DEPTH)


with BuildPart() as cut_extrude1_piece_1_1:
    add(cut_extrude1_piece_1.part)

    # Cut-Extrude2: cut by cut_extrude2_tool
    add(cut_extrude2_tool.part, mode=Mode.SUBTRACT)


with BuildPart() as cut_extrude1_piece_2_1:
    add(cut_extrude1_piece_2.part)

    # Cut-Extrude2: cut by cut_extrude2_tool
    add(cut_extrude2_tool.part, mode=Mode.SUBTRACT)


solid = cut_extrude1_piece_1_1.part
